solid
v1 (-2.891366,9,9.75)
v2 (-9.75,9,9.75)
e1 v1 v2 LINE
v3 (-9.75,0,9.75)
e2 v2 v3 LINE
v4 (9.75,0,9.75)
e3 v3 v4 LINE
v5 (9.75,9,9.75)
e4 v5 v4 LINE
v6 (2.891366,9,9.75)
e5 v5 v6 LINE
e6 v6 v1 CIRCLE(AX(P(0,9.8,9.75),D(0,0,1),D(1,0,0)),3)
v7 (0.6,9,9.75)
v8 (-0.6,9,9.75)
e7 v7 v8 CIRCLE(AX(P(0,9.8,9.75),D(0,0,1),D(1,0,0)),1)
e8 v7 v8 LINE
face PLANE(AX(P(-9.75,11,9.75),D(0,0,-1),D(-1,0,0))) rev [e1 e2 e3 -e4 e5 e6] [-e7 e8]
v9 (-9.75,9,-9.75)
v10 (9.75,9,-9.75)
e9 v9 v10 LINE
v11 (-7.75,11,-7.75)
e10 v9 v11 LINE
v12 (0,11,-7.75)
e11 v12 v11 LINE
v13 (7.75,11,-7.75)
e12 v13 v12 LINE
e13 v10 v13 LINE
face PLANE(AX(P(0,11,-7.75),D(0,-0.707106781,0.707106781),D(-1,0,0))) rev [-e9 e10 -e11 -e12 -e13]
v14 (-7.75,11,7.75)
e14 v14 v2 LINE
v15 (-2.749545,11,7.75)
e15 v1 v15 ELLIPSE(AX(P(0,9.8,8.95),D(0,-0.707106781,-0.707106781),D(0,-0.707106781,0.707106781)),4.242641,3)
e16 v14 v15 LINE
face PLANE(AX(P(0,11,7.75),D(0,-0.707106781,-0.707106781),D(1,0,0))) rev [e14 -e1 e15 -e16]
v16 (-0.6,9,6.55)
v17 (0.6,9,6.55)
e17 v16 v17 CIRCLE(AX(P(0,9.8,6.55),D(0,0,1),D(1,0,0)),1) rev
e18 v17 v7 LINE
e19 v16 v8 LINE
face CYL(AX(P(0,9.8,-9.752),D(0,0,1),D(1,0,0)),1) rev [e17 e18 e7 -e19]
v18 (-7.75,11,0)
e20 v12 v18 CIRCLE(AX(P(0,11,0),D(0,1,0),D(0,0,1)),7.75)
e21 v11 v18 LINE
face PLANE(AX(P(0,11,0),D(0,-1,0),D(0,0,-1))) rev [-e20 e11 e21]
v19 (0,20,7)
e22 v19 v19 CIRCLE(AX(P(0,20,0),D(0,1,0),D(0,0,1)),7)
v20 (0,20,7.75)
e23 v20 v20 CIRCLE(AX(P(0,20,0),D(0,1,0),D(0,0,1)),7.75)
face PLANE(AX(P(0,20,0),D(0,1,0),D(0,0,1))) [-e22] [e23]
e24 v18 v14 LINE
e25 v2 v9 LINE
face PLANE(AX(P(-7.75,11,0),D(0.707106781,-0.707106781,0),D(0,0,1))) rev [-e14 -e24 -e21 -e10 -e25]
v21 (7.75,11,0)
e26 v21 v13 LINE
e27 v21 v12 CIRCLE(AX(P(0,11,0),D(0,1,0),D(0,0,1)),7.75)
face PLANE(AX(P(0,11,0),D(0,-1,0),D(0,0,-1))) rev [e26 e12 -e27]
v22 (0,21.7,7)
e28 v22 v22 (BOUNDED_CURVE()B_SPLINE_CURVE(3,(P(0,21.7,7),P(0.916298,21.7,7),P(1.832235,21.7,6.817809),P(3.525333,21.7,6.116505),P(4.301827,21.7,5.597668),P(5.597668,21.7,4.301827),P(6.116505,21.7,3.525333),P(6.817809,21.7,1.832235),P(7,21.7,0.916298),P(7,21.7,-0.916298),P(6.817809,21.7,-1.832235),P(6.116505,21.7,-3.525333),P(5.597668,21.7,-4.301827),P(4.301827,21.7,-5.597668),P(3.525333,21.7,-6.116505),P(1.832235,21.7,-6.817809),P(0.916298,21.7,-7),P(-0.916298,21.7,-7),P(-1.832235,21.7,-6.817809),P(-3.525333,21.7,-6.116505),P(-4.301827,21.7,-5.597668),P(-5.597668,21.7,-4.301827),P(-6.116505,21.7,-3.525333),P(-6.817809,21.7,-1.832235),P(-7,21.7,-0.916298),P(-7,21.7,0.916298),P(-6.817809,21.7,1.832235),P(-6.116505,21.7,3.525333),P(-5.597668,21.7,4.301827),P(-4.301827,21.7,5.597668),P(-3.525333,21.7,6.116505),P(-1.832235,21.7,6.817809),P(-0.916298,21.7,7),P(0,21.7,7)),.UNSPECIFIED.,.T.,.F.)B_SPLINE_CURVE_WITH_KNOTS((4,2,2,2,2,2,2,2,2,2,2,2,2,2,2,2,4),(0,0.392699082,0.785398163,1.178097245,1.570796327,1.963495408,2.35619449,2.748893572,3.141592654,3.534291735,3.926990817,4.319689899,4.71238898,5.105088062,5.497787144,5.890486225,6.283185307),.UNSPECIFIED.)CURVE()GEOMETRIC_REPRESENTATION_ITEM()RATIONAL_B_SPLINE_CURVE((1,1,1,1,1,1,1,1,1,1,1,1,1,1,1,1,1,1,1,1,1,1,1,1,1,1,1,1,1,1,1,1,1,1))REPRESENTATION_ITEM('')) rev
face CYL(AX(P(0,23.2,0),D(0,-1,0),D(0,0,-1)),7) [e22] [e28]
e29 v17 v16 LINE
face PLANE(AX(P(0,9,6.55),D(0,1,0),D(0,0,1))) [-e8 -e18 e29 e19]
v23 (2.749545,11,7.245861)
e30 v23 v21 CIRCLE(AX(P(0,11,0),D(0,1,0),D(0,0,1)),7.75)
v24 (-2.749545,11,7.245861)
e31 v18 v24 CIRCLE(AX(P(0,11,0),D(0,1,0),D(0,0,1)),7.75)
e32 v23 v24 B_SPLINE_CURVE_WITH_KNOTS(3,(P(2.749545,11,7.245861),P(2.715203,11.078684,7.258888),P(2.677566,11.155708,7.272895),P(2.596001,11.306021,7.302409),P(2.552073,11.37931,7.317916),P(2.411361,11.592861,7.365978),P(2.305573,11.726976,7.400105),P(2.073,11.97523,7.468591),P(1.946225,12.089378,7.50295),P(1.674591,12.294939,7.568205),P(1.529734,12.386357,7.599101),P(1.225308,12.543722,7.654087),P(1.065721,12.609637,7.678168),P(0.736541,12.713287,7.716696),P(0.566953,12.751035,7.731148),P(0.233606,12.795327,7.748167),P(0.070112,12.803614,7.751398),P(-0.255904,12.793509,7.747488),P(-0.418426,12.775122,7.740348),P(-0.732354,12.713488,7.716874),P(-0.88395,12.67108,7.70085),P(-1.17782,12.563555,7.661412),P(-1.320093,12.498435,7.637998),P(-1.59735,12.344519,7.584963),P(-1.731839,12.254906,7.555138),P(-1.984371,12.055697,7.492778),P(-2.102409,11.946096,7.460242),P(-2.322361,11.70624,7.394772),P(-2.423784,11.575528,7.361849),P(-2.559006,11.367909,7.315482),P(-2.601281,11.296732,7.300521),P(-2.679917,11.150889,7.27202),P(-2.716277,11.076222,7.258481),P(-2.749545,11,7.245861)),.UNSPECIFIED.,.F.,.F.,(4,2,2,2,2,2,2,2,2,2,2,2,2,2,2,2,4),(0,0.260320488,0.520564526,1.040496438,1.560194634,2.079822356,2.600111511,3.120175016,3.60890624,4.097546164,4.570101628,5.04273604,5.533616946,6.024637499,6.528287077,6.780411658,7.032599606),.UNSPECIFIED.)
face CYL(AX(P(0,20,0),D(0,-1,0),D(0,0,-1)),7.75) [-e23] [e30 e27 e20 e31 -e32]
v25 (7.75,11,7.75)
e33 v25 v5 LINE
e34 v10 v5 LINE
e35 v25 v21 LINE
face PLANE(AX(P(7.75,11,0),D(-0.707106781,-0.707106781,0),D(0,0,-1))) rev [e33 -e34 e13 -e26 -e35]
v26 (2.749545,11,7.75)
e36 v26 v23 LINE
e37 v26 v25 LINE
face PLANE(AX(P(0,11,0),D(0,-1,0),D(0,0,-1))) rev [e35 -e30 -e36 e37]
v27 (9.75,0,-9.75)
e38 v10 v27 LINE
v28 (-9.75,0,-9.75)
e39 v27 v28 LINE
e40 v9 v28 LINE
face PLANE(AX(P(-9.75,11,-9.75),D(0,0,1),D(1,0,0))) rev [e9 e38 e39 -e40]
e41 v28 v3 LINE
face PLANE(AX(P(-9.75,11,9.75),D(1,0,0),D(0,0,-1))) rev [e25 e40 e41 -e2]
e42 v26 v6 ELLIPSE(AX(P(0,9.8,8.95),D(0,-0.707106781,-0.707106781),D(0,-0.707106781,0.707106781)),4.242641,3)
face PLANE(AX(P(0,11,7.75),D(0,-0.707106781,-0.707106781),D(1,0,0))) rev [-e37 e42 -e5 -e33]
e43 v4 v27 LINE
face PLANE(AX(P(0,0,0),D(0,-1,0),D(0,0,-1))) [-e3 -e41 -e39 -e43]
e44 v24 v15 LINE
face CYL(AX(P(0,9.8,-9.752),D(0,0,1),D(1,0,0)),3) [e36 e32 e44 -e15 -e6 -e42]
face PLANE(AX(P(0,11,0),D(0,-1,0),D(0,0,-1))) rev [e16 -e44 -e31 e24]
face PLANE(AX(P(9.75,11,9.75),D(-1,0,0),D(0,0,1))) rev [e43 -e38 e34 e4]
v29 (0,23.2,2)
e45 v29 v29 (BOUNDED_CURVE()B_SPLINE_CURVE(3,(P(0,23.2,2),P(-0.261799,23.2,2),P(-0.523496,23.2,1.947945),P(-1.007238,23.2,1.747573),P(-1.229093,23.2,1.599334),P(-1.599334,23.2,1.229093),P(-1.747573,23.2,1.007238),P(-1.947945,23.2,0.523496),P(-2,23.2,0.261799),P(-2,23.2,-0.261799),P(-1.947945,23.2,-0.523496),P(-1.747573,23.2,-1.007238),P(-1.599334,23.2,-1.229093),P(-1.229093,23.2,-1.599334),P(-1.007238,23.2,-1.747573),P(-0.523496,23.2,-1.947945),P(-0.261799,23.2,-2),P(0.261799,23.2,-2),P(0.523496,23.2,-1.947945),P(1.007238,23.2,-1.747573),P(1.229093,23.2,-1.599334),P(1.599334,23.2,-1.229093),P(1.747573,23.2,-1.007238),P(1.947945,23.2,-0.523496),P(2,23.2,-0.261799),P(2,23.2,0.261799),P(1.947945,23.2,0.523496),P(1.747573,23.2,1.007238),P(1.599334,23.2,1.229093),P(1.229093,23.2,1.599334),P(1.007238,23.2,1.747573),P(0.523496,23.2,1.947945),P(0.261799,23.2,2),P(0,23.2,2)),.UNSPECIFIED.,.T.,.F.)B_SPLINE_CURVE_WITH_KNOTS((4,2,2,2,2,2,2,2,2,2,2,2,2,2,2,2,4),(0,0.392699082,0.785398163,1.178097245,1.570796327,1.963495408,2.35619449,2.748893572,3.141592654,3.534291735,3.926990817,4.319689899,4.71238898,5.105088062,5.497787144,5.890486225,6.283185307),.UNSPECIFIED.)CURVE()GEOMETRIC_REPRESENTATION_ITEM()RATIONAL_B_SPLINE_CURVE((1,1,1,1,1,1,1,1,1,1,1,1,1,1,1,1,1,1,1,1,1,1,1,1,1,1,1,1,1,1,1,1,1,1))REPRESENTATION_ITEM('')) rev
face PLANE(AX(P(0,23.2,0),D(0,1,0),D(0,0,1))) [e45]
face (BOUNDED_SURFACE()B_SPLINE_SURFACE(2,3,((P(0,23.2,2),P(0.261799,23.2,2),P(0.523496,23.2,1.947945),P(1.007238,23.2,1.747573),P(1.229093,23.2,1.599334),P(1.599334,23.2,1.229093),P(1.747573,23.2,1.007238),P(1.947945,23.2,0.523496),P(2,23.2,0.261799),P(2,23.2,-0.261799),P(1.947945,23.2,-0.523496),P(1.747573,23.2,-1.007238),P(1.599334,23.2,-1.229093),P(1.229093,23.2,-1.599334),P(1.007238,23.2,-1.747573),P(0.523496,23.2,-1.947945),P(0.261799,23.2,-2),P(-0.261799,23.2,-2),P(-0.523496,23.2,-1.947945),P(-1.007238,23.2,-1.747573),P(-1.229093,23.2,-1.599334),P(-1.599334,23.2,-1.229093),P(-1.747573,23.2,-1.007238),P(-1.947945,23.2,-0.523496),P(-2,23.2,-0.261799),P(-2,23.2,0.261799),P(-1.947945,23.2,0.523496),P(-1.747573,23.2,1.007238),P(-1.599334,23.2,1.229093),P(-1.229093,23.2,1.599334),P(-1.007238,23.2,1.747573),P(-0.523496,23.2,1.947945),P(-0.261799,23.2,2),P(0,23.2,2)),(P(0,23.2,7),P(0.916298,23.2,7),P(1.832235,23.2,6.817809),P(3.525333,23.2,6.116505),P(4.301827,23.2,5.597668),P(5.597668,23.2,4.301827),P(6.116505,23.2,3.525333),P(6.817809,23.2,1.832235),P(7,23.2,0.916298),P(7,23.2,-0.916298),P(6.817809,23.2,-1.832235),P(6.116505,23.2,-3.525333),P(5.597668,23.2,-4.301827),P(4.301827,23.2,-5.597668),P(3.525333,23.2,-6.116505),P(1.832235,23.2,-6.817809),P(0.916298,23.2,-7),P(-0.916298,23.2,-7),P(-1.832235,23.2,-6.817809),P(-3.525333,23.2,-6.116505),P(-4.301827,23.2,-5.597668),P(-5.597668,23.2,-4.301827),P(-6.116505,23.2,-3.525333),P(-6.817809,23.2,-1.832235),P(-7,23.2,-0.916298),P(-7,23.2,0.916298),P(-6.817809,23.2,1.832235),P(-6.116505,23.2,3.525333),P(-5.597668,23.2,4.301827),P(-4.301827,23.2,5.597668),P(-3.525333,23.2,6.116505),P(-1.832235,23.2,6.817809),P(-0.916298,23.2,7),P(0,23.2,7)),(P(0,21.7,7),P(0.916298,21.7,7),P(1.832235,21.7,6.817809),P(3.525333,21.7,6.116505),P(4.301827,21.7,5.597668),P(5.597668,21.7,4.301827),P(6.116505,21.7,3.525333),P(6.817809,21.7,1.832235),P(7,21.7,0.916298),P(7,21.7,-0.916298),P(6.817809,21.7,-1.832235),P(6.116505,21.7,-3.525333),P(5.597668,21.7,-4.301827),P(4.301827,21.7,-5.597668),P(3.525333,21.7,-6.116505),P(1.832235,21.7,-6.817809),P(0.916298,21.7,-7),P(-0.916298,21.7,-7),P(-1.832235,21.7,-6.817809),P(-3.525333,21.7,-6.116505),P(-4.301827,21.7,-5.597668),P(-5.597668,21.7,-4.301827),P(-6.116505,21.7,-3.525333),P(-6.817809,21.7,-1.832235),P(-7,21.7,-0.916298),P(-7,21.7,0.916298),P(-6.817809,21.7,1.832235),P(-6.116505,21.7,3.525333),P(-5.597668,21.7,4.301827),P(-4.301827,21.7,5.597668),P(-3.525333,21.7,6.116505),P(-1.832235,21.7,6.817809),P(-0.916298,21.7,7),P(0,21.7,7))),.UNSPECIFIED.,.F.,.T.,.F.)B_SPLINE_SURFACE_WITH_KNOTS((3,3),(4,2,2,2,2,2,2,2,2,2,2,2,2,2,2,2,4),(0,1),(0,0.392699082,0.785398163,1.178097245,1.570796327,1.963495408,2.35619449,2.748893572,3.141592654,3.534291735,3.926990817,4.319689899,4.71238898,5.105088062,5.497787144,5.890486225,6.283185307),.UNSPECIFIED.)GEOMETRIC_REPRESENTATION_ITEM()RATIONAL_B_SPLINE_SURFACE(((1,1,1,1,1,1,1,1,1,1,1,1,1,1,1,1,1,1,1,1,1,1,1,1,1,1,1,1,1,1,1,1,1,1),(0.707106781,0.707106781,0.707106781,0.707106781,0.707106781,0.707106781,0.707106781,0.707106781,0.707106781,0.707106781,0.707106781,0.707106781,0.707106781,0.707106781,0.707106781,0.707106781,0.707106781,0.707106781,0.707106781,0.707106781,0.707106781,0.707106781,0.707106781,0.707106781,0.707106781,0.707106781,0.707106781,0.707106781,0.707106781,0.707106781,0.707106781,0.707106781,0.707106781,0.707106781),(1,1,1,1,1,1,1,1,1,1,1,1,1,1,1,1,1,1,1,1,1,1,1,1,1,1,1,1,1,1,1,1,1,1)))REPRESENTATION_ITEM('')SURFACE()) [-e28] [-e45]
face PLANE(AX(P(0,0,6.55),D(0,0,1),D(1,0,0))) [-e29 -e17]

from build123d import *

# Parameters (mm, degrees)
SKETCH1_W           = 19.5
SKETCH1_H           = 19.5
BOSS_EXTRUDE1_DEPTH = 11
SKETCH2_R           = 7.75
BOSS_EXTRUDE2_DEPTH = 9
SKETCH3_R           = 7
BOSS_EXTRUDE3_DEPTH = 3.2
FILLET1_SIZE        = 1.5
FILLET1_SIZE_2      = 5
CHAMFER1_SIZE       = 2
BOSS_EXTRUDE8_REACH = 33.836
SKETCH4_R           = 3
SKETCH4_R_2         = 1
CUT_EXTRUDE1_DEPTH  = 3.2


# Some blends are built 0.0001 mm under size
with BuildPart() as part:
    # Sketch1 → Boss-Extrude1 (new body)
    with BuildSketch(Plane(origin=(0, 0, 0), x_dir=(1, 0, 0), z_dir=(0, 1, 0))):
        Rectangle(SKETCH1_W, SKETCH1_H)
    extrude(amount=BOSS_EXTRUDE1_DEPTH)

    # Sketch2 → Boss-Extrude2 (add)
    with BuildSketch(Plane(origin=(0, 11, 0), x_dir=(1, 0, 0), z_dir=(0, 1, 0))):
        with Locations(Location((0, 0, 0), (0, 0, 270))):
            Circle(SKETCH2_R)
    extrude(amount=BOSS_EXTRUDE2_DEPTH)

    # Sketch3 → Boss-Extrude3 (add)
    with BuildSketch(Plane(origin=(0, 20, 0), x_dir=(1, 0, 0), z_dir=(0, 1, 0))):
        with Locations(Location((0, 0, 0), (0, 0, 270))):
            Circle(SKETCH3_R)
    extrude(amount=BOSS_EXTRUDE3_DEPTH)

    # Fillet1
    # an asymmetric fillet: 5, 1.5 mm, written as the material it takes off along each edge
    with BuildSketch(Plane(origin=(0, 23.2, 0), x_dir=(0, 0, 1), z_dir=(-1, 0, 0))) as fillet1_piece_1:
        with BuildLine():
            Bezier((7, -FILLET1_SIZE), (7, 0), (7 - FILLET1_SIZE_2, 0), weights=[1, 0.707106781, 1])
            Line((7 - FILLET1_SIZE_2, 0), (7, 0))
            Line((7, 0), (7, -FILLET1_SIZE))
        make_face()
    revolve(axis=Axis((0, 23.2, 0), (0, 1, 0)), mode=Mode.SUBTRACT)

    # Chamfer1
    chamfer1_edges = [part.edges().sort_by_distance(p)[0] for p in [
        (-9.75, 11, 0),
        (0, 11, 9.75),
        (9.75, 11, 0),
        (0, 11, -9.75),
    ]]
    chamfer(chamfer1_edges, length=CHAMFER1_SIZE - 0.0001)  # a hair under: the kernel refuses the full size

    # Sketch4 → Boss-Extrude8 (add, up to next)
    with BuildSketch(Plane.XY.offset(9.75), mode=Mode.PRIVATE) as boss_extrude8_sk1:
        with Locations((0, 9.8)):
            Circle(SKETCH4_R)
        with Locations((0, 9.8)):
            Circle(SKETCH4_R_2, mode=Mode.SUBTRACT)
    boss_extrude8_tool1 = extrude(boss_extrude8_sk1.sketch, amount=-BOSS_EXTRUDE8_REACH, mode=Mode.PRIVATE) - part.part
    add(boss_extrude8_tool1.solids().sort_by_distance((-2.915147, 9.8, 9.75))[0])

    # Sketch5 → Cut-Extrude1 (cut)
    with BuildSketch(Plane.XY.offset(9.75)):
        with BuildLine():
            Line((0.6, 9), (-0.6, 9))
            ThreePointArc((-0.6, 9), (0, 10.8), (0.6, 9))
        make_face()
    extrude(amount=-CUT_EXTRUDE1_DEPTH, mode=Mode.SUBTRACT)


solid = part.part
